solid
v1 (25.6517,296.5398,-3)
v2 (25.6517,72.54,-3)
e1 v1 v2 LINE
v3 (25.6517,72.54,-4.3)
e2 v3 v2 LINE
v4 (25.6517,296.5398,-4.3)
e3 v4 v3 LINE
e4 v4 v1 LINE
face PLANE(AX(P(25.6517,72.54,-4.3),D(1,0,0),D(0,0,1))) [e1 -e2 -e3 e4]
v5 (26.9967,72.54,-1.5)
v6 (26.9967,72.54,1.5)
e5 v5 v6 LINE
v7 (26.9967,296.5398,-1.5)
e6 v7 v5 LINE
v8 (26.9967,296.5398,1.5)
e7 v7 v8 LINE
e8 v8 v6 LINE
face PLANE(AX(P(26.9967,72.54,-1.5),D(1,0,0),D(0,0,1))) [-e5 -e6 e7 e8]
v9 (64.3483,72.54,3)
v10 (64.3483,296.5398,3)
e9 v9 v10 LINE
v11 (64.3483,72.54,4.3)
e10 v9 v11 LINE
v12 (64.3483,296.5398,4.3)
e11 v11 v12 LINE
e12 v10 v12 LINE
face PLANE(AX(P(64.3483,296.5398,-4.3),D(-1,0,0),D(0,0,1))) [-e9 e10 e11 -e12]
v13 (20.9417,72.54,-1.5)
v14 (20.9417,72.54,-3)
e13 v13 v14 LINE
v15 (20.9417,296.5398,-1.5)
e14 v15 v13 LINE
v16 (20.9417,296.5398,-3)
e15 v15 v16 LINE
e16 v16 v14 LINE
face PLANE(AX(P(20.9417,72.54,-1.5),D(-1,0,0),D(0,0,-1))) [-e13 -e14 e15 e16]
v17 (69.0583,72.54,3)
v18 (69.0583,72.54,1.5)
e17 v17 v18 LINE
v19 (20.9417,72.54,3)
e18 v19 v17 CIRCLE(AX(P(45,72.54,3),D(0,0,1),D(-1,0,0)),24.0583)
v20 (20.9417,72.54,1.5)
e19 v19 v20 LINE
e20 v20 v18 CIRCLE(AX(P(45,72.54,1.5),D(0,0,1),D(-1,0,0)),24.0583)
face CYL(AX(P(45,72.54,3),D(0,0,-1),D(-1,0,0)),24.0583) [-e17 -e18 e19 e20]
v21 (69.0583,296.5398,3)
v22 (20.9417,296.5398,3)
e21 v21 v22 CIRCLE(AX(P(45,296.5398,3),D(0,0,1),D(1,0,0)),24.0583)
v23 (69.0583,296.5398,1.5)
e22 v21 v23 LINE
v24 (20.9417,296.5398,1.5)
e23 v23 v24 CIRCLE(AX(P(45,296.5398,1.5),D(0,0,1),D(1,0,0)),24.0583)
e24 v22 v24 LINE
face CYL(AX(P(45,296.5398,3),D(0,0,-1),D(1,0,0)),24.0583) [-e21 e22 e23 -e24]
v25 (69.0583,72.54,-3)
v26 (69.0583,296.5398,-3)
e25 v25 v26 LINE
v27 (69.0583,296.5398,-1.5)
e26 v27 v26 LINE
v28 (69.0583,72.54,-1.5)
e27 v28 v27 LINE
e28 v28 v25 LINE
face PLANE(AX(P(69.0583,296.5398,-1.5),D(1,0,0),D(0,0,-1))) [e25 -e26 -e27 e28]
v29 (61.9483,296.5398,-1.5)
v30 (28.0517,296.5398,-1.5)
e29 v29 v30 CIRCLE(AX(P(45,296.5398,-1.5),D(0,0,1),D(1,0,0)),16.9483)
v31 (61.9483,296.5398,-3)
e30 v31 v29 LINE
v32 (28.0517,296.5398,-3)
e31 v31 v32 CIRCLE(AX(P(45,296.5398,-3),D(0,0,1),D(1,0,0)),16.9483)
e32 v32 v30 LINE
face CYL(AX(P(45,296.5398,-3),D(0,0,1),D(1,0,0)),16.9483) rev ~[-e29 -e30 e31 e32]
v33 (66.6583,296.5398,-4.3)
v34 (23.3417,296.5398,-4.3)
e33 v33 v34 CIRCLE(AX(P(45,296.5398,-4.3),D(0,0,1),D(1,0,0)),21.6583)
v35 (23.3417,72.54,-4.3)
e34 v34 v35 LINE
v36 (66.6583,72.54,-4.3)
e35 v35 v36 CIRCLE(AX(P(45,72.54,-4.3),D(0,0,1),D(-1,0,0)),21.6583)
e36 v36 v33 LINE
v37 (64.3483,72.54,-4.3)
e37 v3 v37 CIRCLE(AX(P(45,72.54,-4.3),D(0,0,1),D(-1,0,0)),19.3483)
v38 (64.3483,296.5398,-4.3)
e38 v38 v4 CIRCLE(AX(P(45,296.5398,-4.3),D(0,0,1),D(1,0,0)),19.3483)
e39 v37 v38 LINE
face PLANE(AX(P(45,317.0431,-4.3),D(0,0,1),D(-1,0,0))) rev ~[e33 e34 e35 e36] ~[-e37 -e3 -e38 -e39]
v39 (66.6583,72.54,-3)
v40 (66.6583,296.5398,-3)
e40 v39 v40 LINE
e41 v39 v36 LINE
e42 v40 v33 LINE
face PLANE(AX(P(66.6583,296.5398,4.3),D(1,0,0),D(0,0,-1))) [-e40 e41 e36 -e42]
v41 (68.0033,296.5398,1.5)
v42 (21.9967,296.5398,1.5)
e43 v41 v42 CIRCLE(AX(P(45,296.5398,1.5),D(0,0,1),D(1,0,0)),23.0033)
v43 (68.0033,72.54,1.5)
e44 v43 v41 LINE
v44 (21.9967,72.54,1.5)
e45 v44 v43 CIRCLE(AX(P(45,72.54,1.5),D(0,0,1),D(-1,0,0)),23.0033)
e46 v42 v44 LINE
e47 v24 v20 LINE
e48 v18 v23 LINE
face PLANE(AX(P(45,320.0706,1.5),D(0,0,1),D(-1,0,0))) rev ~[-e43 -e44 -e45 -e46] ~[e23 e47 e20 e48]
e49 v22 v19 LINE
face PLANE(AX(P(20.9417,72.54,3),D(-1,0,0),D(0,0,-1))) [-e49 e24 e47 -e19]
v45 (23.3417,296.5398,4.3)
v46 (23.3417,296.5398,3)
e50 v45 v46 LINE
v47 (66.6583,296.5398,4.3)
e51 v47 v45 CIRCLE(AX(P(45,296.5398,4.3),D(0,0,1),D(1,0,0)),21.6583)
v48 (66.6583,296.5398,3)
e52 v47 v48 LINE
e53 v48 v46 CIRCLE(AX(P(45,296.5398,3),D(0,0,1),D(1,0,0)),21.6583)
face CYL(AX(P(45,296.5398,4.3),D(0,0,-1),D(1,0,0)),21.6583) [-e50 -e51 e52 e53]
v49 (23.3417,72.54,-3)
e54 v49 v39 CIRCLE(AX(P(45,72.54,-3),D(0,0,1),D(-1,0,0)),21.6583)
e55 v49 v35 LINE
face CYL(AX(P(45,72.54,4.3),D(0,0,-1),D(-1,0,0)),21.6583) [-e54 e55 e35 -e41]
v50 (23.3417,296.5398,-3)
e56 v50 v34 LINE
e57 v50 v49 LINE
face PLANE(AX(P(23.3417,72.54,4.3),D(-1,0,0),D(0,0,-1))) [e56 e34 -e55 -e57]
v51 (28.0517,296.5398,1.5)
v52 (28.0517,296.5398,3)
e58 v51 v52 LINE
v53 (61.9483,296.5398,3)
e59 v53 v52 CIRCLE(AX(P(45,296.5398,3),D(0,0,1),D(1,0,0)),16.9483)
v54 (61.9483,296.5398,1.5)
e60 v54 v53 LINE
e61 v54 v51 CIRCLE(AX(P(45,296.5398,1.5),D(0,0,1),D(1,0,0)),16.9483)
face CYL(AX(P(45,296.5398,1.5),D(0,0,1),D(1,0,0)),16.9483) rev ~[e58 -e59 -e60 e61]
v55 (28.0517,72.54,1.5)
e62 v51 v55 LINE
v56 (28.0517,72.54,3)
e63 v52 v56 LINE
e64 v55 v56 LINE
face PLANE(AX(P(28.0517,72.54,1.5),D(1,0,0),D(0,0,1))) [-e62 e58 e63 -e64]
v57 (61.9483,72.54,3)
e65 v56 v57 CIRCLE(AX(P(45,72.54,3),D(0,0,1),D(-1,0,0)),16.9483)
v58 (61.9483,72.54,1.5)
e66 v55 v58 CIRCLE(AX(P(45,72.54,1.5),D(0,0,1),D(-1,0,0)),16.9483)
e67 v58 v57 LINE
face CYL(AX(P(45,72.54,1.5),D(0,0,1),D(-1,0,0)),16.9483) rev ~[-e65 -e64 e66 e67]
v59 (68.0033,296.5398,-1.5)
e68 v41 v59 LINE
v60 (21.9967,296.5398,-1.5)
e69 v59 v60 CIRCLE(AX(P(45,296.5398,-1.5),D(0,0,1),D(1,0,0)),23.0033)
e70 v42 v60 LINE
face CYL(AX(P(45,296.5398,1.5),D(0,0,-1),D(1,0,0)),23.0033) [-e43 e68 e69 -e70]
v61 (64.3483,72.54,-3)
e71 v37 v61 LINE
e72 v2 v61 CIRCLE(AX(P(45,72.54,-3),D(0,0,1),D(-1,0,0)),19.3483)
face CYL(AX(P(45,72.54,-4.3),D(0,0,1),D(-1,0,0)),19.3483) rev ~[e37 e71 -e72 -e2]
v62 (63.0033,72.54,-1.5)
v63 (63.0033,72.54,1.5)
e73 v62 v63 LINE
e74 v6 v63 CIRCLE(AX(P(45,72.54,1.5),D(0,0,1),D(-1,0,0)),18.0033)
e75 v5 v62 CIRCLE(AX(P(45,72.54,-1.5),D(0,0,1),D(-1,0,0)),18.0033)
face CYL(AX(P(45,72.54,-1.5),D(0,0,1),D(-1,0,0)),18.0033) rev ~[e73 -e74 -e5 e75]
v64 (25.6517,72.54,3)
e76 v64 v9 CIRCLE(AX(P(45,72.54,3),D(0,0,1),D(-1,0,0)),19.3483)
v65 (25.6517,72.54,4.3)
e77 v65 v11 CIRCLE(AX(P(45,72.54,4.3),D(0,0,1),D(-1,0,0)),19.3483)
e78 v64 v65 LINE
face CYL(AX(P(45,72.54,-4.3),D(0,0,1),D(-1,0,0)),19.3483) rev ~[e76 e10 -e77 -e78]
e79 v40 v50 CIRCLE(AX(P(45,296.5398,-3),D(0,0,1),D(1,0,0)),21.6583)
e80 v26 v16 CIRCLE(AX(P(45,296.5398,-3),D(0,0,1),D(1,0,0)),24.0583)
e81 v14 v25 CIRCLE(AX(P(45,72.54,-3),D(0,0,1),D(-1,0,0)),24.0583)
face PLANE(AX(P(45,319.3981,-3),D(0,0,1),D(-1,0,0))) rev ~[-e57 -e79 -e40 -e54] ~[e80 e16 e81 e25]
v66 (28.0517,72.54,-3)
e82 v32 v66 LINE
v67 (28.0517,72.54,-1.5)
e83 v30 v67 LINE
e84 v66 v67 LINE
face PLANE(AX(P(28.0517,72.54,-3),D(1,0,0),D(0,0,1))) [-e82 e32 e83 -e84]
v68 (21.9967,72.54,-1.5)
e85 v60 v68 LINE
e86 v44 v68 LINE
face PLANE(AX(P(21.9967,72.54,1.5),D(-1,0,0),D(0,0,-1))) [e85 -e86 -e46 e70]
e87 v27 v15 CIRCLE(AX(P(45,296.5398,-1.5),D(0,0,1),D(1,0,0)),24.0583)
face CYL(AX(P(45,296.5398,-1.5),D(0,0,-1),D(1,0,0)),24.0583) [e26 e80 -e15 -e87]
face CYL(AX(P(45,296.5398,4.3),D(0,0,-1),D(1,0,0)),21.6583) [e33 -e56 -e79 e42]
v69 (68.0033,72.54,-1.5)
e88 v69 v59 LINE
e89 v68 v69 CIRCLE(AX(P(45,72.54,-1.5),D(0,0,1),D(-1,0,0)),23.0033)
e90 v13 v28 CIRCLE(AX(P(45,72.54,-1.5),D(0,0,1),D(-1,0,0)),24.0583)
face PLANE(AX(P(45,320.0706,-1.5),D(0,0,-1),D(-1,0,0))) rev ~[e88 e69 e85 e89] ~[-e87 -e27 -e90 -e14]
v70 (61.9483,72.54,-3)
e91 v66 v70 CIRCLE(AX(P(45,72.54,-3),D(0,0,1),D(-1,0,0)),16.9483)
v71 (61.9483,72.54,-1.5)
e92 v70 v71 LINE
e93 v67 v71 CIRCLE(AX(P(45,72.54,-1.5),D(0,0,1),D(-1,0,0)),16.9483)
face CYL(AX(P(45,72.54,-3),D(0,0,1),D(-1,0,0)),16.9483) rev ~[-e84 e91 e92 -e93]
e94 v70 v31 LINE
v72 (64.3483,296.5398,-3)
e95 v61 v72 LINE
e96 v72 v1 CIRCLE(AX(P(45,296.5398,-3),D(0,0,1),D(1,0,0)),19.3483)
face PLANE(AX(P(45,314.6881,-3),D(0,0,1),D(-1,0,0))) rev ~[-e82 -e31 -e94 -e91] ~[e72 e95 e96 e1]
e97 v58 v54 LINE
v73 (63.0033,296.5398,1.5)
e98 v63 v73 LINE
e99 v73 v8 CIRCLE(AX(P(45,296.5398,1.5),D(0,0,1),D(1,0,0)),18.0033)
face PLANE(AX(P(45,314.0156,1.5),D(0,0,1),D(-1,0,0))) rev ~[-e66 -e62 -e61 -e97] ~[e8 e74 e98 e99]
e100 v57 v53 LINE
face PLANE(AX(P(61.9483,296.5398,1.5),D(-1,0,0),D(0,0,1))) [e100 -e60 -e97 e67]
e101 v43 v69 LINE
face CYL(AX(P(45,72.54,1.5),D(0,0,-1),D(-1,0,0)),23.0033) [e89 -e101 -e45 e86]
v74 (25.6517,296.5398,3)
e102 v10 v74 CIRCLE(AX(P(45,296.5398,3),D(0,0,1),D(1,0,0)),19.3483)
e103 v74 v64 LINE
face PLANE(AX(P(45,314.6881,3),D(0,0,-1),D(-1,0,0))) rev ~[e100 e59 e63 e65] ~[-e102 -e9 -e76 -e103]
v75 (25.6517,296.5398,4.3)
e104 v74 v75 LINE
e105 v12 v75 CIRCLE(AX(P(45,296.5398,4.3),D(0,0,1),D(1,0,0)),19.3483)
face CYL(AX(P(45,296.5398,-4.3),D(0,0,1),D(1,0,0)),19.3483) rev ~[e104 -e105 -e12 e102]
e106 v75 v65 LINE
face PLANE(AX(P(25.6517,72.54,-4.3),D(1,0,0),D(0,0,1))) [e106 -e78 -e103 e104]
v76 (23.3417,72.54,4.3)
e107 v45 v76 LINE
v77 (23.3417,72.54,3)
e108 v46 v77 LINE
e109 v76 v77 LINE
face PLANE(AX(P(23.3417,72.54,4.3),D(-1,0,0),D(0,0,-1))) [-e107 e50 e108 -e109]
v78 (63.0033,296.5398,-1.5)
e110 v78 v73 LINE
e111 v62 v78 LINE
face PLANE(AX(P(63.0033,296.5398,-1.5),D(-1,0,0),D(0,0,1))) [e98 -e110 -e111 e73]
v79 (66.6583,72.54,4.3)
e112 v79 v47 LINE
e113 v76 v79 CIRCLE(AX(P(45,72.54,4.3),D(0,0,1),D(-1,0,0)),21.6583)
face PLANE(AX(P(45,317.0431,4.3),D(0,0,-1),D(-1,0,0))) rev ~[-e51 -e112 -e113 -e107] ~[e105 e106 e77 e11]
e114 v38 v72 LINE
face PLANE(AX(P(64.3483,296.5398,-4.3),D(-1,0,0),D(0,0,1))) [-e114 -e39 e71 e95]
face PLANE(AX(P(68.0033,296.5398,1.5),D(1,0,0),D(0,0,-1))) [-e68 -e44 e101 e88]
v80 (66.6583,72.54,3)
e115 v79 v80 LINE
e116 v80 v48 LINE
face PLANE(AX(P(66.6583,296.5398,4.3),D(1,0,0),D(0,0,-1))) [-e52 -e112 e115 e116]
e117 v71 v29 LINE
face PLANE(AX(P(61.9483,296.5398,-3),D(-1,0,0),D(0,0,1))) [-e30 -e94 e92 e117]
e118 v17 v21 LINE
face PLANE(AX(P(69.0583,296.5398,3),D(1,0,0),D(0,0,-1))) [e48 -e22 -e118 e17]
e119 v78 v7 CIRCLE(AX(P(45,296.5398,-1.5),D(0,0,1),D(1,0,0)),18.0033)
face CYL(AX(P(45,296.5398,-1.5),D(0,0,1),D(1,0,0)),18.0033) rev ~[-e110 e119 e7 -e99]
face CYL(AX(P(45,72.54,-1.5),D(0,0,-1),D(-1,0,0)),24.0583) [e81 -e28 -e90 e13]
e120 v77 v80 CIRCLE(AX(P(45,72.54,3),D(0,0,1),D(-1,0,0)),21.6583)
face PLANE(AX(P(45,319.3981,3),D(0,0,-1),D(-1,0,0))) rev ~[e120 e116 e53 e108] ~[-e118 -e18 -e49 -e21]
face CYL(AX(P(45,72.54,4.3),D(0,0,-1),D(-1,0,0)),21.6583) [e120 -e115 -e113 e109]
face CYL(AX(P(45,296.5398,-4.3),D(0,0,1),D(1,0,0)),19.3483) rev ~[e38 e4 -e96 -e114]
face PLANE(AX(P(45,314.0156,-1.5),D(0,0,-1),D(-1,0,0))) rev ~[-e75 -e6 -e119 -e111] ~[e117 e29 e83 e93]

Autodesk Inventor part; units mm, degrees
ref_plane "Work Plane2" through (45, 296.5398, 0) normal (-1, 0, 0) x (0, 0, 1)
ref_plane "Work Plane3" through (45, 72.54, 0) normal (0.0000088, 1, 0) x (0, 0, 1)
sketch "Path" plane through (0, 0, 0) normal (0, 0, 1) x (1, 0, 0)
  arc A0 (65.5033, 296.5398) -> (24.4967, 296.5398) centre (45, 296.5398) ccw
  arc A1 (24.4967, 72.54) -> (65.5033, 72.54) centre (45, 72.54) ccw
  line L0 (24.4967, 72.54) -> (24.4967, 296.5398)
  line L1 (65.5033, 296.5398) -> (65.5033, 72.54)
ref_plane "Section Plane" through (24.4967, 296.5398, 0) normal (0, -1, 0) x (0, 0, 1)
sketch "Section Sketch" plane through (24.4967, 296.5398, 0) normal (0, -1, 0) x (0, 0, 1)
  line L0 (-4.3, -1.155) -> (4.3, -1.155)
  line L1 (4.3, -1.155) -> (4.3, 1.155)
  line L2 (4.3, 1.155) -> (-4.3, 1.155)
  line L3 (-4.3, 1.155) -> (-4.3, -1.155)
  line L4 (-1.5, -2.5) -> (1.5, -2.5)
  line L5 (1.5, -2.5) -> (1.5, 2.5)
  line L6 (1.5, 2.5) -> (-1.5, 2.5)
  line L7 (-1.5, 2.5) -> (-1.5, -2.5)
  line L8 (-1.5, 0) -> (1.5, 0) construction
  line L9 (-3, -3.555) -> (-1.5, -3.555)
  line L10 (-1.5, -3.555) -> (-1.5, 3.555)
  line L11 (-1.5, 3.555) -> (-3, 3.555)
  line L12 (-3, 3.555) -> (-3, -3.555)
  line L13 (1.5, -3.555) -> (3, -3.555)
  line L14 (3, -3.555) -> (3, 3.555)
  line L15 (3, 3.555) -> (1.5, 3.555)
  line L16 (1.5, 3.555) -> (1.5, -3.555)
  line L17 (-4.3, 0) -> (4.3, 0) construction
  point P0 (0, 0)
  point P1 (0, 0)
  dimension "d21" = 2.31
  dimension "d22" = 5
  dimension "d23" = 3
  dimension "d24" = 1.5
  dimension "d31" = 7.11
  dimension "d32" = 8.6
sweep "Solid" add profiles "Section Sketch" path "Path"
pattern_of_one "Strand Pattern"
equation "\"d21\" = da_d2"
equation "\"d22\" = da_d1"
equation "\"d23\" = da_b1"
equation "\"d24\" = da_t1 + da_t2"
equation "\"d30\" = da_pt"
equation "\"da_p\" = 8"
equation "\"da_b1\" = 3"
equation "\"da_h2\" = 7.11"
equation "\"da_h3\" = 7.11"
equation "\"da_d1\" = 5"
equation "\"da_d2\" = 2.31"
equation "\"da_pt\" = 5.64"
equation "\"da_b\" = 8.6"
equation "\"da_t1\" = 0.75"
equation "\"da_t2\" = 0.75"
properties part number "Roller Chain"
